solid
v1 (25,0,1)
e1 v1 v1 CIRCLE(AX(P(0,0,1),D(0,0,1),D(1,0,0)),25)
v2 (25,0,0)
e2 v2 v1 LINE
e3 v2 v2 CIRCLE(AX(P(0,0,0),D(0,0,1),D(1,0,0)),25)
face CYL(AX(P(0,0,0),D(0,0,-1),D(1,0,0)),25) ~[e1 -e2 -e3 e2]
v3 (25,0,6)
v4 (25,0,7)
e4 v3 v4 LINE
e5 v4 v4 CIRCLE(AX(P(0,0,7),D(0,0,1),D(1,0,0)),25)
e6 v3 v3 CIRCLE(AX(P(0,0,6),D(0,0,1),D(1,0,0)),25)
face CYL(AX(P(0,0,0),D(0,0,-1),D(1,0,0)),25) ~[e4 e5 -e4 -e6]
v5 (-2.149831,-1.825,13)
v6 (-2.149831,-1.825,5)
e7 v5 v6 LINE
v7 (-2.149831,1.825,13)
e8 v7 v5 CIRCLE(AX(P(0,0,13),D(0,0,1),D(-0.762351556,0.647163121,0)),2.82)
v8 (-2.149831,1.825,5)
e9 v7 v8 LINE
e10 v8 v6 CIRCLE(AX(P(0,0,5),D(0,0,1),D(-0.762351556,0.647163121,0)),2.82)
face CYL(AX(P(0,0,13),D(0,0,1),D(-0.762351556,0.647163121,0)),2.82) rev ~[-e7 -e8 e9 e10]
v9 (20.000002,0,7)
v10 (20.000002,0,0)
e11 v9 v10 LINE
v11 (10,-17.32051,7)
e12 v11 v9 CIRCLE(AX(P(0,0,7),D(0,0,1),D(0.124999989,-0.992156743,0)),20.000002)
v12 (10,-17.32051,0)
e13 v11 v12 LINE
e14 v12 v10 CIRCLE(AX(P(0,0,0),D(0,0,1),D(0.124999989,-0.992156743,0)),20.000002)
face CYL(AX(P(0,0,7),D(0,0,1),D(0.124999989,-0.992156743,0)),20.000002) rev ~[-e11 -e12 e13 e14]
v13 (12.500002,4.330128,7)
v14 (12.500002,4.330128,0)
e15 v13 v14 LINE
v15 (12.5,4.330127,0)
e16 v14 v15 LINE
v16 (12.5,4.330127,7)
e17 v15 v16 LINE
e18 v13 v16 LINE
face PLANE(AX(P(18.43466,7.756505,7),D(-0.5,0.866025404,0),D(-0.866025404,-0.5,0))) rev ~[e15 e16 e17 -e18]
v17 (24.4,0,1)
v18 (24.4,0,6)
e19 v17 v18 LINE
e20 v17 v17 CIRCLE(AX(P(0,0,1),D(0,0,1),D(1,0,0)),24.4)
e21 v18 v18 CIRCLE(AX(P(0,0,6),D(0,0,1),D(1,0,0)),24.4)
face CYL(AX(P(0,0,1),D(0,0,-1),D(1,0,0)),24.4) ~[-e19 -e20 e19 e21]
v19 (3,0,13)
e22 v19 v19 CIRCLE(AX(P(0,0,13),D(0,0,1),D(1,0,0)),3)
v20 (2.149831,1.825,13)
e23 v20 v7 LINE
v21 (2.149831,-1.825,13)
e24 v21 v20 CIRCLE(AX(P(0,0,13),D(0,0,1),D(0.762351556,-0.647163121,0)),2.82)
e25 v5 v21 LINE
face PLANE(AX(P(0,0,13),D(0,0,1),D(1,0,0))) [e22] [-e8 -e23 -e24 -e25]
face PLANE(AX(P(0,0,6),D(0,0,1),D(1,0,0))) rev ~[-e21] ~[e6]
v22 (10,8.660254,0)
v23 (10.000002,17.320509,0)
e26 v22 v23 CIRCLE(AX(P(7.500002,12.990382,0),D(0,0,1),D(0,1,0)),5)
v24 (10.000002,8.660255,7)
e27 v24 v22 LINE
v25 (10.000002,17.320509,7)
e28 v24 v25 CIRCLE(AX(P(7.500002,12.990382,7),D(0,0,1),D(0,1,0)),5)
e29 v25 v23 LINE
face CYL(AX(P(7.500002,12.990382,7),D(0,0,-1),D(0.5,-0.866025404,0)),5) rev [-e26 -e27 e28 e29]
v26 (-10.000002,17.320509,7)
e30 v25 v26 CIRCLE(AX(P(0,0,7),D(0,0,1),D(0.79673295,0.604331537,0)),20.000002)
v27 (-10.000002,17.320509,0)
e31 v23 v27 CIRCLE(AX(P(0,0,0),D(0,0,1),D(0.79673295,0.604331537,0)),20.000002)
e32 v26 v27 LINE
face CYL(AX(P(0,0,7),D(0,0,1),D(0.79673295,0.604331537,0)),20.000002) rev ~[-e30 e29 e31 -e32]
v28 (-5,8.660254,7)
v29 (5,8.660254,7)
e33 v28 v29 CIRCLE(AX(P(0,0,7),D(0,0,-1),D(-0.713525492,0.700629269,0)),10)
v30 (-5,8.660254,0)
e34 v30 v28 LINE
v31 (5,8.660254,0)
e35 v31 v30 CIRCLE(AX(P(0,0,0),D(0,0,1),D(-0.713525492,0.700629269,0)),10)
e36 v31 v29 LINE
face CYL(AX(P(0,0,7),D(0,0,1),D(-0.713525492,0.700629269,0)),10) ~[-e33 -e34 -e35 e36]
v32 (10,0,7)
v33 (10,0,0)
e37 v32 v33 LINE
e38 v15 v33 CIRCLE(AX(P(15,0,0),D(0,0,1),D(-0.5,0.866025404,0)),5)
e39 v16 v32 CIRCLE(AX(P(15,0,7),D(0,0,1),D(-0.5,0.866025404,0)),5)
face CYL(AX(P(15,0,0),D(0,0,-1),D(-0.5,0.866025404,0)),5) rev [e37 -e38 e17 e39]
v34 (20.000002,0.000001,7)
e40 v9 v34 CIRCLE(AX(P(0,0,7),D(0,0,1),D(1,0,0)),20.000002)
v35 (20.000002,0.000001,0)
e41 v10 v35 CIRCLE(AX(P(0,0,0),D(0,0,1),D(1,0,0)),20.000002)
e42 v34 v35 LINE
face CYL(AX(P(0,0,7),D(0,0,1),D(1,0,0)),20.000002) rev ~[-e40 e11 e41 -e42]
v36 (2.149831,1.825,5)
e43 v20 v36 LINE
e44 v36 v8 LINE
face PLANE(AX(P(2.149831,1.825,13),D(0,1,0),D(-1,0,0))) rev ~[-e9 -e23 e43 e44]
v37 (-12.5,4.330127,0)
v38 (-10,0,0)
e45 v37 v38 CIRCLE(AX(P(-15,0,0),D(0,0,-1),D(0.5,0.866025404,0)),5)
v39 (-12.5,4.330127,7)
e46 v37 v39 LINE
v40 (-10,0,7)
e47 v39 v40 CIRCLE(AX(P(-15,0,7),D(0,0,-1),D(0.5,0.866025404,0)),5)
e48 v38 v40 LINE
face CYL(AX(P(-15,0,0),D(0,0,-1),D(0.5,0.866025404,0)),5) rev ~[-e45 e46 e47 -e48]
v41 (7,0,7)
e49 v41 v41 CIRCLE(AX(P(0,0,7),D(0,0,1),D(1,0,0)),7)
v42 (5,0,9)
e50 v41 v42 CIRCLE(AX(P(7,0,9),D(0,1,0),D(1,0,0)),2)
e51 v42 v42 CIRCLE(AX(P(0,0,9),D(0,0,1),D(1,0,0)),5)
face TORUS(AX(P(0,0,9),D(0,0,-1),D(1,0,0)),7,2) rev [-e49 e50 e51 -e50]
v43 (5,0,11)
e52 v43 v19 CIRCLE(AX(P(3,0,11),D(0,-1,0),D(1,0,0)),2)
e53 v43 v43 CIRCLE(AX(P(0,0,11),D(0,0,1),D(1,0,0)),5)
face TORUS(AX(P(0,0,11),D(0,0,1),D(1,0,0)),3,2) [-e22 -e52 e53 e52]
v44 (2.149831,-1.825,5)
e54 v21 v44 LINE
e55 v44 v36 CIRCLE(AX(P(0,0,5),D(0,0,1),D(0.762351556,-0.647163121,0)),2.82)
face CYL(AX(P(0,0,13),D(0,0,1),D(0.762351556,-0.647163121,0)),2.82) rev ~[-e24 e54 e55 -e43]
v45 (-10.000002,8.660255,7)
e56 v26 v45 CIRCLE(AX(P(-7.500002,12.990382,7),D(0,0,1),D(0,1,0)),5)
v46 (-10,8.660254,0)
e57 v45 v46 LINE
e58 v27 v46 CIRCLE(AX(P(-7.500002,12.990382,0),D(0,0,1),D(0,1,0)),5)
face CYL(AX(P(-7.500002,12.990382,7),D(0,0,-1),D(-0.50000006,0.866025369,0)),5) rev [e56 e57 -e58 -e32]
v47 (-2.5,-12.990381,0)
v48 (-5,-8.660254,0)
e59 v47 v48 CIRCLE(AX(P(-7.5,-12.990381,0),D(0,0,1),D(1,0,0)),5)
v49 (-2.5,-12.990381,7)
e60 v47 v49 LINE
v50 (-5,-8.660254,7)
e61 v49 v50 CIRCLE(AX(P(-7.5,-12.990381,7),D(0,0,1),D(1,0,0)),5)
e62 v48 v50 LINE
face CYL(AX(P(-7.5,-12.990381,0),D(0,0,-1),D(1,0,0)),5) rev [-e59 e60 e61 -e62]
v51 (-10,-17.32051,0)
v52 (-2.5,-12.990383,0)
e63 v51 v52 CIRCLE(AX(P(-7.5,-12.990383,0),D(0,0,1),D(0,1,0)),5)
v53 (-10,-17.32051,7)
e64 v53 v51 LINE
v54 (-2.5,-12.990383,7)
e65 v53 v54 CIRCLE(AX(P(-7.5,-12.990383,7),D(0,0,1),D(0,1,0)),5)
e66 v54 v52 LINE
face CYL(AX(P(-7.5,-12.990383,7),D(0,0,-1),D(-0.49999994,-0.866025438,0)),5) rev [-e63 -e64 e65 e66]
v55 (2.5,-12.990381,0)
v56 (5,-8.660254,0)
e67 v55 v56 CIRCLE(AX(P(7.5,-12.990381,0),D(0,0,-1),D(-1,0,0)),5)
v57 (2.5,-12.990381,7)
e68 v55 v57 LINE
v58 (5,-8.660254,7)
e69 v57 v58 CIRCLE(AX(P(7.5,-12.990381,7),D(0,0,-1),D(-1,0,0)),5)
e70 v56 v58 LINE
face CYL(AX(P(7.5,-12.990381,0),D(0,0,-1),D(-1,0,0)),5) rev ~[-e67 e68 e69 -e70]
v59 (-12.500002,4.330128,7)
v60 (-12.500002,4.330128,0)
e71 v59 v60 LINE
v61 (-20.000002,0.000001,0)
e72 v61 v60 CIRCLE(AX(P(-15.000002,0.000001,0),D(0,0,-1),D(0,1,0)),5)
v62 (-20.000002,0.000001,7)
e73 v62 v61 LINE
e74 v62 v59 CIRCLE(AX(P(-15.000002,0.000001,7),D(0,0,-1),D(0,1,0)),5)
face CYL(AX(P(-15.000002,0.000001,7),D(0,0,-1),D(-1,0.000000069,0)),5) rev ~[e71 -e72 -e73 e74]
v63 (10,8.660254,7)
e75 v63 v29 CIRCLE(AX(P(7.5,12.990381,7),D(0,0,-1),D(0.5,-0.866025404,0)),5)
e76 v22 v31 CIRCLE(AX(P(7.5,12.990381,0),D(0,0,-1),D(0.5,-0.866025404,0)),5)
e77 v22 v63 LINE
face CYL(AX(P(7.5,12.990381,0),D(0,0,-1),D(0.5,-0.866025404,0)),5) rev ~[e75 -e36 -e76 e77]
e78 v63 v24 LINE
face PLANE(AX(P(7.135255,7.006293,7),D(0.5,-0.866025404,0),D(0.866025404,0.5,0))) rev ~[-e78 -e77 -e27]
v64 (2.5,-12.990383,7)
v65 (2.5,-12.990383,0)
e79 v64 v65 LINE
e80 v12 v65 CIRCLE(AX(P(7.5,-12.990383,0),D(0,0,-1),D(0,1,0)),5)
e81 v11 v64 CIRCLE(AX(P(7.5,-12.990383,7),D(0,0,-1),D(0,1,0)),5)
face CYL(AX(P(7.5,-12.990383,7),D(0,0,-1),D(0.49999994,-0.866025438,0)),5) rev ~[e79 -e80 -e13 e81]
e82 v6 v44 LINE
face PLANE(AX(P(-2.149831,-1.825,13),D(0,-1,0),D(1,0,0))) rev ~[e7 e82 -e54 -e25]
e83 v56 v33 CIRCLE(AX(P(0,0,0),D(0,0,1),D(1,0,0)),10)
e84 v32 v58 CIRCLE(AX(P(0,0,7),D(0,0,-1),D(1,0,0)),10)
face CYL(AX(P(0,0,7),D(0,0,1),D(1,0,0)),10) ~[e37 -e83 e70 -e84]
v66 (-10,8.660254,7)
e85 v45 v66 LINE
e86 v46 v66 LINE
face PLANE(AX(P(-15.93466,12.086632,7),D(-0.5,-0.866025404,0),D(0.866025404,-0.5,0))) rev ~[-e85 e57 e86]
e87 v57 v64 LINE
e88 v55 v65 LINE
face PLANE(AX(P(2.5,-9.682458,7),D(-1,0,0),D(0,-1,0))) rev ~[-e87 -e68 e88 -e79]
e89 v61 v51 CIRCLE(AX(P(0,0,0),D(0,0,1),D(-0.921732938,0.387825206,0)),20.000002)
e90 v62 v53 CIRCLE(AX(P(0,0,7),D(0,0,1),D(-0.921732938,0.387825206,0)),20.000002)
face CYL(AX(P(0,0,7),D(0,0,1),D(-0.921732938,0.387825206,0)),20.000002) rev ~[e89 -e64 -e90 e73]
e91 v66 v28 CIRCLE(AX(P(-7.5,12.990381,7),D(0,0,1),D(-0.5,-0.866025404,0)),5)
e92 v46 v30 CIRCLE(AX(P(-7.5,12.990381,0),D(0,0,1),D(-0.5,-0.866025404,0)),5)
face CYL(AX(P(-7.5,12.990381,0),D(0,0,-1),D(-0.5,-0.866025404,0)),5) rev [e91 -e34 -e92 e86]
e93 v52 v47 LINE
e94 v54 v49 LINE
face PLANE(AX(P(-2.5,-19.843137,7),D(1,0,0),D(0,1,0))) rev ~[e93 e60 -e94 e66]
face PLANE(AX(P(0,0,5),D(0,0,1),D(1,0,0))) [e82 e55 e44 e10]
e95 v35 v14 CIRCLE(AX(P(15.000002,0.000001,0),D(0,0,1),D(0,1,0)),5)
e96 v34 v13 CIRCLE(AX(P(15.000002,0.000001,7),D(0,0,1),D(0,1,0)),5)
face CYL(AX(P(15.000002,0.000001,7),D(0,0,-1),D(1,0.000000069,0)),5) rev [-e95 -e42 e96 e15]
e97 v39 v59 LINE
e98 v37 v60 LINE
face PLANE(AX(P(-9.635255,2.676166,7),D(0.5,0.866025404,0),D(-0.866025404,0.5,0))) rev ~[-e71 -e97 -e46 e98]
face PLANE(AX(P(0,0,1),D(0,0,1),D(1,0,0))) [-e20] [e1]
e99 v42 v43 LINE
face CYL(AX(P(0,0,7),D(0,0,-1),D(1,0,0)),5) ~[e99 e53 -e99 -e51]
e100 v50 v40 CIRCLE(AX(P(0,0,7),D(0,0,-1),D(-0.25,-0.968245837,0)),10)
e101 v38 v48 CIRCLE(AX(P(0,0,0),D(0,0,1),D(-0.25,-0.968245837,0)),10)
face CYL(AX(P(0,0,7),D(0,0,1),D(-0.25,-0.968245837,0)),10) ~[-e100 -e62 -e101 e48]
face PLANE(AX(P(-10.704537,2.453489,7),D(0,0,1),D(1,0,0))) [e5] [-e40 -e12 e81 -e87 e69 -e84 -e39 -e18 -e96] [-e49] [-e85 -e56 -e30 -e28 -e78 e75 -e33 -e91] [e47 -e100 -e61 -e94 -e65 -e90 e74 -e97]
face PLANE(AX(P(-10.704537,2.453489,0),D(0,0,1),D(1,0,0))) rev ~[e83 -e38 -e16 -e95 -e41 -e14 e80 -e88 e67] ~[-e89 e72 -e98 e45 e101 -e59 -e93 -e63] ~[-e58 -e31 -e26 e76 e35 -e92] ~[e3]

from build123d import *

# Parameters (mm, degrees)
F0_R         = 25
F1_DEPTH     = 7
F2_R         = 5
F3_DEPTH     = 6
F5_DEPTH     = 8
F7_R         = 25
F7_R_2       = 24.4
F8_DEPTH     = 5
F10_DEPTH    = 25
F11_R        = 5
F12_T1_DEPTH = 7
F13_R        = 2


# Not quite as in the source:
# - a fillet or chamfer that OpenCascade refuses, or shapes differently, is made with other operations: its cross-section is extruded or revolved along the edge and cut away or added


with BuildPart() as f1:
    # F0 (on Top) → F1 (new body)
    with BuildSketch(Plane.XY):
        Circle(F0_R)
    extrude(amount=F1_DEPTH)

    # F2 (on face) → F3 (join)
    with BuildSketch(Plane.XY.offset(7)):
        Circle(F2_R)
    extrude(amount=F3_DEPTH)

    # F4 (on face) → F5 (cut)
    with BuildSketch(Plane.XY.offset(13)):
        with BuildLine():
            Line((2.1498313887, 1.825), (-2.1498313887, 1.825))
            ThreePointArc((-2.1498313887, 1.825), (-2.82, 0), (-2.1498313887, -1.825))
            Line((-2.1498313887, -1.825), (2.1498313887, -1.825))
            ThreePointArc((2.1498313887, -1.825), (2.82, 0), (2.1498313887, 1.825))
        make_face()
    extrude(amount=-F5_DEPTH, mode=Mode.SUBTRACT)

    # F7 (on offset) → F8 (cut)
    with BuildSketch(Plane.XY.offset(1)):
        Circle(F7_R)
        Circle(F7_R_2, mode=Mode.SUBTRACT)
    extrude(amount=F8_DEPTH, mode=Mode.SUBTRACT)

    # F9 (on face) → F10 (cut)
    with BuildSketch(Plane.XY.offset(7)):
        with BuildLine():
            Line((7.1352549156, 7.0062926922), (15.9346604169, 12.0866318271))
            ThreePointArc((15.9346604169, 12.0866318271), (0, 20.0000017881), (-15.9346604169, 12.0866318271))
            Line((-15.9346604169, 12.0866318271), (-7.1352549156, 7.0062926922))
            ThreePointArc((-7.1352549156, 7.0062926922), (0, 10), (7.1352549156, 7.0062926922))
        make_face()
        with BuildLine():
            ThreePointArc((2.5, -19.8431366353), (15.0000012666, -13.2287578225), (20.0000017881, 0))
            ThreePointArc((20.0000017881, 0), (19.6047610649, 3.9564397015), (18.4346604169, 7.7565048082))
            Line((18.4346604169, 7.7565048082), (9.6352549156, 2.6761656733))
            ThreePointArc((9.6352549156, 2.6761656733), (9.9083941473, 1.3504537837), (10, 0))
            ThreePointArc((10, 0), (7.9056941504, -6.123724357), (2.5, -9.6824583655))
            Line((2.5, -9.6824583655), (2.5, -19.8431366353))
        make_face()
        with BuildLine():
            ThreePointArc((-18.4346604169, 7.7565048082), (-17.3205096243, -10.0000008941), (-2.5, -19.8431366353))
            Line((-2.5, -19.8431366353), (-2.5, -9.6824583655))
            ThreePointArc((-2.5, -9.6824583655), (-8.6602540378, -5), (-9.6352549156, 2.6761656733))
            Line((-9.6352549156, 2.6761656733), (-18.4346604169, 7.7565048082))
        make_face()
    extrude(amount=-F10_DEPTH, mode=Mode.SUBTRACT)

    # F11
    f11_edges = [f1.edges().sort_by_distance(p)[0] for p in [
        (-18.43466, 7.756505, 3.5),
        (-15.93466, 12.086632, 3.5),
        (15.93466, 12.086632, 3.5),
        (18.43466, 7.756505, 3.5),
        (2.5, -19.843137, 3.5),
        (-2.5, -19.843137, 3.5),
    ]]
    fillet(f11_edges, radius=F11_R)

    # F12: fillet of radius 5 on 6 edges, made by hand

    # F12_s2 → F12_t1 (join)
    with BuildSketch(Plane.XY):
        with BuildLine():
            ThreePointArc((-12.5, 4.3301270189), (-10.6698729811, 2.5), (-10, 0))
            ThreePointArc((-10, 0), (-9.9083941473, 1.3504537837), (-9.6352549156, 2.6761656733))
            Line((-9.6352549156, 2.6761656733), (-12.5, 4.3301270189))
        make_face()
        with BuildLine():
            ThreePointArc((-2.5, -12.9903810568), (-3.1698729811, -10.4903810568), (-5, -8.6602540378))
            ThreePointArc((-5, -8.6602540378), (-3.7846697903, -9.2561479341), (-2.5, -9.6824583655))
            Line((-2.5, -9.6824583655), (-2.5, -12.9903810568))
        make_face()
        with BuildLine():
            ThreePointArc((2.5, -12.9903810568), (3.1698729811, -10.4903810568), (5, -8.6602540378))
            ThreePointArc((5, -8.6602540378), (3.7846697903, -9.2561479341), (2.5, -9.6824583655))
            Line((2.5, -9.6824583655), (2.5, -12.9903810568))
        make_face()
        with BuildLine():
            ThreePointArc((12.5, 4.3301270189), (10.6698729811, 2.5), (10, 0))
            ThreePointArc((10, 0), (9.9083941473, 1.3504537837), (9.6352549156, 2.6761656733))
            Line((9.6352549156, 2.6761656733), (12.5, 4.3301270189))
        make_face()
        with BuildLine():
            ThreePointArc((10, 8.6602540378), (7.5, 7.9903810568), (5, 8.6602540378))
            ThreePointArc((5, 8.6602540378), (6.123724357, 7.9056941504), (7.1352549156, 7.0062926922))
            Line((7.1352549156, 7.0062926922), (10, 8.6602540378))
        make_face()
        with BuildLine():
            ThreePointArc((-10, 8.6602540378), (-7.5, 7.9903810568), (-5, 8.6602540378))
            ThreePointArc((-5, 8.6602540378), (-6.123724357, 7.9056941504), (-7.1352549156, 7.0062926922))
            Line((-7.1352549156, 7.0062926922), (-10, 8.6602540378))
        make_face()
    extrude(amount=F12_T1_DEPTH)

    # F13
    f13_edges = [f1.edges().sort_by_distance(p)[0] for p in [
        (-5, 0, 7),
        (-5, 0, 13),
    ]]
    fillet(f13_edges, radius=F13_R)


solid = f1.part
